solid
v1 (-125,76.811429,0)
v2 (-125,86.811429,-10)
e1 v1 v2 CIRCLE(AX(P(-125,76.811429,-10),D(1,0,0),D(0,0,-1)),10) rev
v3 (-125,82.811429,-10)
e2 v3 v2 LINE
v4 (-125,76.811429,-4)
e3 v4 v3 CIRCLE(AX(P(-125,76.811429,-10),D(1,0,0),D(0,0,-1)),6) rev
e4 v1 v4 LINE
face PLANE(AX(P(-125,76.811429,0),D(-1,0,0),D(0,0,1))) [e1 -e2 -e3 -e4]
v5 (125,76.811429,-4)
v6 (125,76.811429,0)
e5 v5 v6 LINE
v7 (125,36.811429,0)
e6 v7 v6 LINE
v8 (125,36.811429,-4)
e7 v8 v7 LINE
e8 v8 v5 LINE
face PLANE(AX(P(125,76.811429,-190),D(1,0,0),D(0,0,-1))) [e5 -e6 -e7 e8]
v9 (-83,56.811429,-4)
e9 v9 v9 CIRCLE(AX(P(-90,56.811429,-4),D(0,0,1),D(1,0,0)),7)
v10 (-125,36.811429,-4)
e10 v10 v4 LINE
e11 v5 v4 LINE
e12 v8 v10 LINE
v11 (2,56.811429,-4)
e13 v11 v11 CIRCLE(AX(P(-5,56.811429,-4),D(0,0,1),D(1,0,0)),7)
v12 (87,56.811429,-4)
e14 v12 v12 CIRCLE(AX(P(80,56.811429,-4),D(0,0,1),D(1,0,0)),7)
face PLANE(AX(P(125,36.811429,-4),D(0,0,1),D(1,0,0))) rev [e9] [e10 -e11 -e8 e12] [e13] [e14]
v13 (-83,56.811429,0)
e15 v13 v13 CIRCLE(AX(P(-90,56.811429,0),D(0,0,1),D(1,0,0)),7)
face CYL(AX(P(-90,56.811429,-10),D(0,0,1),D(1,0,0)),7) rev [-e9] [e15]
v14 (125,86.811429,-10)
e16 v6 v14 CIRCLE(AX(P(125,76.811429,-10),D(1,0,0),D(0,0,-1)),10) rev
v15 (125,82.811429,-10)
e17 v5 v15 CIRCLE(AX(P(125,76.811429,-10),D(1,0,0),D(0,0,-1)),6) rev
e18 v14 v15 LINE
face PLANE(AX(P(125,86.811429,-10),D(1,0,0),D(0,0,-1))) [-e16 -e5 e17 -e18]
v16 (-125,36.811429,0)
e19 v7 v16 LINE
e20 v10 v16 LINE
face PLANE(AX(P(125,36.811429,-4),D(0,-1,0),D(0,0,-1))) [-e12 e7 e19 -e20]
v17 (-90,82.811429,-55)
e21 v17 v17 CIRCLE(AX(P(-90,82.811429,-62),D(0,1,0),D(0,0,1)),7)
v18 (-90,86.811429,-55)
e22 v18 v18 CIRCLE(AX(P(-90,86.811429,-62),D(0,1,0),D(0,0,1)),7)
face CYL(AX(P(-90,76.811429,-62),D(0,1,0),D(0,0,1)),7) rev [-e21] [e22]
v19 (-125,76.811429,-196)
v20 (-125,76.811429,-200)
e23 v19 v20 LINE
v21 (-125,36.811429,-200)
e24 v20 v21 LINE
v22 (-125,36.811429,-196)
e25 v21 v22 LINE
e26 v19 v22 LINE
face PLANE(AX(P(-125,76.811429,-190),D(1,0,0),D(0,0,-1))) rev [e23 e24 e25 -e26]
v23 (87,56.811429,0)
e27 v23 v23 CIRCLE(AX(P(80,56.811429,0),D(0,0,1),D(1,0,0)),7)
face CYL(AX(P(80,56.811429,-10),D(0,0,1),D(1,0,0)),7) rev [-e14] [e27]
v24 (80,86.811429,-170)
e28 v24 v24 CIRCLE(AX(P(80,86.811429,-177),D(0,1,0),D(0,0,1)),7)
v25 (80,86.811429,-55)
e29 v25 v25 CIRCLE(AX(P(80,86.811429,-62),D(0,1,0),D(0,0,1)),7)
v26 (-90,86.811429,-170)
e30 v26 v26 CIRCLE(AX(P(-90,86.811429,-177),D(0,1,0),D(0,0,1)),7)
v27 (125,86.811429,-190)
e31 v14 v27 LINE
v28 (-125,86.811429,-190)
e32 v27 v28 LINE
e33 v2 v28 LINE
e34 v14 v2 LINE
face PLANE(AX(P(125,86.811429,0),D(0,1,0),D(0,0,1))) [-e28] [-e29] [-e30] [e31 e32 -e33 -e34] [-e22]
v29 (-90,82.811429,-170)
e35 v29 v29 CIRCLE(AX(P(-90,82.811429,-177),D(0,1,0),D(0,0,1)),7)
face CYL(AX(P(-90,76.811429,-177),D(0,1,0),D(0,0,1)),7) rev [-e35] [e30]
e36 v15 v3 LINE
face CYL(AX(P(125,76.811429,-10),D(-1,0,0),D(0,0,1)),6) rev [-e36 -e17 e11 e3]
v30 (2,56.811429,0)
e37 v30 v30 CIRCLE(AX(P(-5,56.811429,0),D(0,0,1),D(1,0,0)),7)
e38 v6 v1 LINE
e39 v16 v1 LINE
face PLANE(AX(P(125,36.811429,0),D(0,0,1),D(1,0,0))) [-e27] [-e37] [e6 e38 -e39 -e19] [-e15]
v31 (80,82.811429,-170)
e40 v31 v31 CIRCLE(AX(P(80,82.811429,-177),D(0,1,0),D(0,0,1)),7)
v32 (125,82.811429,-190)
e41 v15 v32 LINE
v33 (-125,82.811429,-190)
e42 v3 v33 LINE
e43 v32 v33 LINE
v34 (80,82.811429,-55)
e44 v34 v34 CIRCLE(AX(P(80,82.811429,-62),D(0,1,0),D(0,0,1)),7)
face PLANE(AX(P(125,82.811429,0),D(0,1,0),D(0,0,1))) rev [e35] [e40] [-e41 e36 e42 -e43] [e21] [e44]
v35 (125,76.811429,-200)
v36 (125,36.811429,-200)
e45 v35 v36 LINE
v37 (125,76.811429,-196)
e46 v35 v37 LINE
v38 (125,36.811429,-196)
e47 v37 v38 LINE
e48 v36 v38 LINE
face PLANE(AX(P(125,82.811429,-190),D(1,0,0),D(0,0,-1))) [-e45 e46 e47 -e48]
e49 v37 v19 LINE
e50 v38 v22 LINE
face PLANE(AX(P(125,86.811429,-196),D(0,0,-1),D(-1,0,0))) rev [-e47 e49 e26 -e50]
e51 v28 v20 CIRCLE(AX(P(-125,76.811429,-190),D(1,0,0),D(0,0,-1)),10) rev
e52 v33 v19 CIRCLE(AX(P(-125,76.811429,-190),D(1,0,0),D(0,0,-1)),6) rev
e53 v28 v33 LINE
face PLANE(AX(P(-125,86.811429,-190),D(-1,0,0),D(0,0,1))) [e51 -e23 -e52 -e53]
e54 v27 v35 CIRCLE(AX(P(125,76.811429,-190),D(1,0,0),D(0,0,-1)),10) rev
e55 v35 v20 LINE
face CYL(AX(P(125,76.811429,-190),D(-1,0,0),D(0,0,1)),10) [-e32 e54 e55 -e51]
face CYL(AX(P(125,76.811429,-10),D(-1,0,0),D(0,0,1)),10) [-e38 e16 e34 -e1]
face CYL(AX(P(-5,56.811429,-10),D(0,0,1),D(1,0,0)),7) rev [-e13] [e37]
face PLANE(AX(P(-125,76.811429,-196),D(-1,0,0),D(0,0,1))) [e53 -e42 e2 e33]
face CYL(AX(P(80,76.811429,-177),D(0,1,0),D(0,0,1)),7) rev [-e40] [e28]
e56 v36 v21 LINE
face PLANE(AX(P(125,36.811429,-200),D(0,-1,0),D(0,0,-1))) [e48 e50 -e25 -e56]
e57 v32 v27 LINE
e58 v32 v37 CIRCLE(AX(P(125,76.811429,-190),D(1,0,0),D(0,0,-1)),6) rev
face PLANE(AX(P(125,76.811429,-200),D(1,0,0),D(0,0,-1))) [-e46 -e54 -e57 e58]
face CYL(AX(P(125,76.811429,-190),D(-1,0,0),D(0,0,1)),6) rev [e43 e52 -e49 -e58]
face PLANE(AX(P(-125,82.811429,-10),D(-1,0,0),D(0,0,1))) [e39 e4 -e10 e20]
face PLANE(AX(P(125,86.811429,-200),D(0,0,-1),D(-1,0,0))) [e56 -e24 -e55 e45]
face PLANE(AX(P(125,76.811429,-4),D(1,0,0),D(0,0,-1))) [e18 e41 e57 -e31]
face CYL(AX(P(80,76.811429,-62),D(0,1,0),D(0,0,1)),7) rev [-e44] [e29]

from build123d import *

# Parameters (mm, degrees)
BASE_FLANGE1_DEPTH = 125
SKETCH6_R          = 7
CUT_EXTRUDE1_DEPTH = 10
SKETCH7_R          = 7
CUT_EXTRUDE2_DEPTH = 10


# Sheet-metal steps are written as plain solids
with BuildPart() as part:
    # Sketch1 → Base-Flange1 (new, symmetric)
    with BuildSketch(Plane(origin=(0, 0, 0), x_dir=(0, 0, -1), z_dir=(1, 0, 0))):
        with BuildLine():
            Line((0, 36.811428571), (0, 76.811428571))
            ThreePointArc((0, 76.811428571), (2.928932188, 83.882496383), (10, 86.811428571))
            Line((10, 86.811428571), (190, 86.811428571))
            ThreePointArc((190, 86.811428571), (197.071067812, 83.882496383), (200, 76.811428571))
            Line((200, 76.811428571), (200, 36.811428571))
            Line((200, 36.811428571), (196, 36.811428571))
            Line((196, 36.811428571), (196, 76.811428571))
            ThreePointArc((196, 76.811428571), (194.242640687, 81.054069259), (190, 82.811428571))
            Line((190, 82.811428571), (10, 82.811428571))
            ThreePointArc((10, 82.811428571), (5.757359313, 81.054069259), (4, 76.811428571))
            Line((4, 76.811428571), (4, 36.811428571))
            Line((4, 36.811428571), (0, 36.811428571))
        make_face()
    extrude(amount=BASE_FLANGE1_DEPTH, both=True)

    # Sketch6 → Cut-Extrude1 (cut)
    with BuildSketch(Plane(origin=(0, 86.811428571, 0), x_dir=(1, 0, 0), z_dir=(0, 1, 0))):
        with Locations(Location((-90, 177, 0), (0, 0, 270))):
            Circle(SKETCH6_R)
        with Locations(Location((80, 177, 0), (0, 0, 270))):
            Circle(SKETCH6_R)
        with Locations(Location((80, 62, 0), (0, 0, 270))):
            Circle(SKETCH6_R)
        with Locations(Location((-90, 62, 0), (0, 0, 270))):
            Circle(SKETCH6_R)
    extrude(amount=-CUT_EXTRUDE1_DEPTH, mode=Mode.SUBTRACT)

    # Sketch7 → Cut-Extrude2 (cut)
    with BuildSketch(Plane.XY):
        with Locations((-90, 56.811428571)):
            Circle(SKETCH7_R)
        with Locations((-5, 56.811428571)):
            Circle(SKETCH7_R)
        with Locations((80, 56.811428571)):
            Circle(SKETCH7_R)
    extrude(amount=-CUT_EXTRUDE2_DEPTH, mode=Mode.SUBTRACT)


solid = part.part
